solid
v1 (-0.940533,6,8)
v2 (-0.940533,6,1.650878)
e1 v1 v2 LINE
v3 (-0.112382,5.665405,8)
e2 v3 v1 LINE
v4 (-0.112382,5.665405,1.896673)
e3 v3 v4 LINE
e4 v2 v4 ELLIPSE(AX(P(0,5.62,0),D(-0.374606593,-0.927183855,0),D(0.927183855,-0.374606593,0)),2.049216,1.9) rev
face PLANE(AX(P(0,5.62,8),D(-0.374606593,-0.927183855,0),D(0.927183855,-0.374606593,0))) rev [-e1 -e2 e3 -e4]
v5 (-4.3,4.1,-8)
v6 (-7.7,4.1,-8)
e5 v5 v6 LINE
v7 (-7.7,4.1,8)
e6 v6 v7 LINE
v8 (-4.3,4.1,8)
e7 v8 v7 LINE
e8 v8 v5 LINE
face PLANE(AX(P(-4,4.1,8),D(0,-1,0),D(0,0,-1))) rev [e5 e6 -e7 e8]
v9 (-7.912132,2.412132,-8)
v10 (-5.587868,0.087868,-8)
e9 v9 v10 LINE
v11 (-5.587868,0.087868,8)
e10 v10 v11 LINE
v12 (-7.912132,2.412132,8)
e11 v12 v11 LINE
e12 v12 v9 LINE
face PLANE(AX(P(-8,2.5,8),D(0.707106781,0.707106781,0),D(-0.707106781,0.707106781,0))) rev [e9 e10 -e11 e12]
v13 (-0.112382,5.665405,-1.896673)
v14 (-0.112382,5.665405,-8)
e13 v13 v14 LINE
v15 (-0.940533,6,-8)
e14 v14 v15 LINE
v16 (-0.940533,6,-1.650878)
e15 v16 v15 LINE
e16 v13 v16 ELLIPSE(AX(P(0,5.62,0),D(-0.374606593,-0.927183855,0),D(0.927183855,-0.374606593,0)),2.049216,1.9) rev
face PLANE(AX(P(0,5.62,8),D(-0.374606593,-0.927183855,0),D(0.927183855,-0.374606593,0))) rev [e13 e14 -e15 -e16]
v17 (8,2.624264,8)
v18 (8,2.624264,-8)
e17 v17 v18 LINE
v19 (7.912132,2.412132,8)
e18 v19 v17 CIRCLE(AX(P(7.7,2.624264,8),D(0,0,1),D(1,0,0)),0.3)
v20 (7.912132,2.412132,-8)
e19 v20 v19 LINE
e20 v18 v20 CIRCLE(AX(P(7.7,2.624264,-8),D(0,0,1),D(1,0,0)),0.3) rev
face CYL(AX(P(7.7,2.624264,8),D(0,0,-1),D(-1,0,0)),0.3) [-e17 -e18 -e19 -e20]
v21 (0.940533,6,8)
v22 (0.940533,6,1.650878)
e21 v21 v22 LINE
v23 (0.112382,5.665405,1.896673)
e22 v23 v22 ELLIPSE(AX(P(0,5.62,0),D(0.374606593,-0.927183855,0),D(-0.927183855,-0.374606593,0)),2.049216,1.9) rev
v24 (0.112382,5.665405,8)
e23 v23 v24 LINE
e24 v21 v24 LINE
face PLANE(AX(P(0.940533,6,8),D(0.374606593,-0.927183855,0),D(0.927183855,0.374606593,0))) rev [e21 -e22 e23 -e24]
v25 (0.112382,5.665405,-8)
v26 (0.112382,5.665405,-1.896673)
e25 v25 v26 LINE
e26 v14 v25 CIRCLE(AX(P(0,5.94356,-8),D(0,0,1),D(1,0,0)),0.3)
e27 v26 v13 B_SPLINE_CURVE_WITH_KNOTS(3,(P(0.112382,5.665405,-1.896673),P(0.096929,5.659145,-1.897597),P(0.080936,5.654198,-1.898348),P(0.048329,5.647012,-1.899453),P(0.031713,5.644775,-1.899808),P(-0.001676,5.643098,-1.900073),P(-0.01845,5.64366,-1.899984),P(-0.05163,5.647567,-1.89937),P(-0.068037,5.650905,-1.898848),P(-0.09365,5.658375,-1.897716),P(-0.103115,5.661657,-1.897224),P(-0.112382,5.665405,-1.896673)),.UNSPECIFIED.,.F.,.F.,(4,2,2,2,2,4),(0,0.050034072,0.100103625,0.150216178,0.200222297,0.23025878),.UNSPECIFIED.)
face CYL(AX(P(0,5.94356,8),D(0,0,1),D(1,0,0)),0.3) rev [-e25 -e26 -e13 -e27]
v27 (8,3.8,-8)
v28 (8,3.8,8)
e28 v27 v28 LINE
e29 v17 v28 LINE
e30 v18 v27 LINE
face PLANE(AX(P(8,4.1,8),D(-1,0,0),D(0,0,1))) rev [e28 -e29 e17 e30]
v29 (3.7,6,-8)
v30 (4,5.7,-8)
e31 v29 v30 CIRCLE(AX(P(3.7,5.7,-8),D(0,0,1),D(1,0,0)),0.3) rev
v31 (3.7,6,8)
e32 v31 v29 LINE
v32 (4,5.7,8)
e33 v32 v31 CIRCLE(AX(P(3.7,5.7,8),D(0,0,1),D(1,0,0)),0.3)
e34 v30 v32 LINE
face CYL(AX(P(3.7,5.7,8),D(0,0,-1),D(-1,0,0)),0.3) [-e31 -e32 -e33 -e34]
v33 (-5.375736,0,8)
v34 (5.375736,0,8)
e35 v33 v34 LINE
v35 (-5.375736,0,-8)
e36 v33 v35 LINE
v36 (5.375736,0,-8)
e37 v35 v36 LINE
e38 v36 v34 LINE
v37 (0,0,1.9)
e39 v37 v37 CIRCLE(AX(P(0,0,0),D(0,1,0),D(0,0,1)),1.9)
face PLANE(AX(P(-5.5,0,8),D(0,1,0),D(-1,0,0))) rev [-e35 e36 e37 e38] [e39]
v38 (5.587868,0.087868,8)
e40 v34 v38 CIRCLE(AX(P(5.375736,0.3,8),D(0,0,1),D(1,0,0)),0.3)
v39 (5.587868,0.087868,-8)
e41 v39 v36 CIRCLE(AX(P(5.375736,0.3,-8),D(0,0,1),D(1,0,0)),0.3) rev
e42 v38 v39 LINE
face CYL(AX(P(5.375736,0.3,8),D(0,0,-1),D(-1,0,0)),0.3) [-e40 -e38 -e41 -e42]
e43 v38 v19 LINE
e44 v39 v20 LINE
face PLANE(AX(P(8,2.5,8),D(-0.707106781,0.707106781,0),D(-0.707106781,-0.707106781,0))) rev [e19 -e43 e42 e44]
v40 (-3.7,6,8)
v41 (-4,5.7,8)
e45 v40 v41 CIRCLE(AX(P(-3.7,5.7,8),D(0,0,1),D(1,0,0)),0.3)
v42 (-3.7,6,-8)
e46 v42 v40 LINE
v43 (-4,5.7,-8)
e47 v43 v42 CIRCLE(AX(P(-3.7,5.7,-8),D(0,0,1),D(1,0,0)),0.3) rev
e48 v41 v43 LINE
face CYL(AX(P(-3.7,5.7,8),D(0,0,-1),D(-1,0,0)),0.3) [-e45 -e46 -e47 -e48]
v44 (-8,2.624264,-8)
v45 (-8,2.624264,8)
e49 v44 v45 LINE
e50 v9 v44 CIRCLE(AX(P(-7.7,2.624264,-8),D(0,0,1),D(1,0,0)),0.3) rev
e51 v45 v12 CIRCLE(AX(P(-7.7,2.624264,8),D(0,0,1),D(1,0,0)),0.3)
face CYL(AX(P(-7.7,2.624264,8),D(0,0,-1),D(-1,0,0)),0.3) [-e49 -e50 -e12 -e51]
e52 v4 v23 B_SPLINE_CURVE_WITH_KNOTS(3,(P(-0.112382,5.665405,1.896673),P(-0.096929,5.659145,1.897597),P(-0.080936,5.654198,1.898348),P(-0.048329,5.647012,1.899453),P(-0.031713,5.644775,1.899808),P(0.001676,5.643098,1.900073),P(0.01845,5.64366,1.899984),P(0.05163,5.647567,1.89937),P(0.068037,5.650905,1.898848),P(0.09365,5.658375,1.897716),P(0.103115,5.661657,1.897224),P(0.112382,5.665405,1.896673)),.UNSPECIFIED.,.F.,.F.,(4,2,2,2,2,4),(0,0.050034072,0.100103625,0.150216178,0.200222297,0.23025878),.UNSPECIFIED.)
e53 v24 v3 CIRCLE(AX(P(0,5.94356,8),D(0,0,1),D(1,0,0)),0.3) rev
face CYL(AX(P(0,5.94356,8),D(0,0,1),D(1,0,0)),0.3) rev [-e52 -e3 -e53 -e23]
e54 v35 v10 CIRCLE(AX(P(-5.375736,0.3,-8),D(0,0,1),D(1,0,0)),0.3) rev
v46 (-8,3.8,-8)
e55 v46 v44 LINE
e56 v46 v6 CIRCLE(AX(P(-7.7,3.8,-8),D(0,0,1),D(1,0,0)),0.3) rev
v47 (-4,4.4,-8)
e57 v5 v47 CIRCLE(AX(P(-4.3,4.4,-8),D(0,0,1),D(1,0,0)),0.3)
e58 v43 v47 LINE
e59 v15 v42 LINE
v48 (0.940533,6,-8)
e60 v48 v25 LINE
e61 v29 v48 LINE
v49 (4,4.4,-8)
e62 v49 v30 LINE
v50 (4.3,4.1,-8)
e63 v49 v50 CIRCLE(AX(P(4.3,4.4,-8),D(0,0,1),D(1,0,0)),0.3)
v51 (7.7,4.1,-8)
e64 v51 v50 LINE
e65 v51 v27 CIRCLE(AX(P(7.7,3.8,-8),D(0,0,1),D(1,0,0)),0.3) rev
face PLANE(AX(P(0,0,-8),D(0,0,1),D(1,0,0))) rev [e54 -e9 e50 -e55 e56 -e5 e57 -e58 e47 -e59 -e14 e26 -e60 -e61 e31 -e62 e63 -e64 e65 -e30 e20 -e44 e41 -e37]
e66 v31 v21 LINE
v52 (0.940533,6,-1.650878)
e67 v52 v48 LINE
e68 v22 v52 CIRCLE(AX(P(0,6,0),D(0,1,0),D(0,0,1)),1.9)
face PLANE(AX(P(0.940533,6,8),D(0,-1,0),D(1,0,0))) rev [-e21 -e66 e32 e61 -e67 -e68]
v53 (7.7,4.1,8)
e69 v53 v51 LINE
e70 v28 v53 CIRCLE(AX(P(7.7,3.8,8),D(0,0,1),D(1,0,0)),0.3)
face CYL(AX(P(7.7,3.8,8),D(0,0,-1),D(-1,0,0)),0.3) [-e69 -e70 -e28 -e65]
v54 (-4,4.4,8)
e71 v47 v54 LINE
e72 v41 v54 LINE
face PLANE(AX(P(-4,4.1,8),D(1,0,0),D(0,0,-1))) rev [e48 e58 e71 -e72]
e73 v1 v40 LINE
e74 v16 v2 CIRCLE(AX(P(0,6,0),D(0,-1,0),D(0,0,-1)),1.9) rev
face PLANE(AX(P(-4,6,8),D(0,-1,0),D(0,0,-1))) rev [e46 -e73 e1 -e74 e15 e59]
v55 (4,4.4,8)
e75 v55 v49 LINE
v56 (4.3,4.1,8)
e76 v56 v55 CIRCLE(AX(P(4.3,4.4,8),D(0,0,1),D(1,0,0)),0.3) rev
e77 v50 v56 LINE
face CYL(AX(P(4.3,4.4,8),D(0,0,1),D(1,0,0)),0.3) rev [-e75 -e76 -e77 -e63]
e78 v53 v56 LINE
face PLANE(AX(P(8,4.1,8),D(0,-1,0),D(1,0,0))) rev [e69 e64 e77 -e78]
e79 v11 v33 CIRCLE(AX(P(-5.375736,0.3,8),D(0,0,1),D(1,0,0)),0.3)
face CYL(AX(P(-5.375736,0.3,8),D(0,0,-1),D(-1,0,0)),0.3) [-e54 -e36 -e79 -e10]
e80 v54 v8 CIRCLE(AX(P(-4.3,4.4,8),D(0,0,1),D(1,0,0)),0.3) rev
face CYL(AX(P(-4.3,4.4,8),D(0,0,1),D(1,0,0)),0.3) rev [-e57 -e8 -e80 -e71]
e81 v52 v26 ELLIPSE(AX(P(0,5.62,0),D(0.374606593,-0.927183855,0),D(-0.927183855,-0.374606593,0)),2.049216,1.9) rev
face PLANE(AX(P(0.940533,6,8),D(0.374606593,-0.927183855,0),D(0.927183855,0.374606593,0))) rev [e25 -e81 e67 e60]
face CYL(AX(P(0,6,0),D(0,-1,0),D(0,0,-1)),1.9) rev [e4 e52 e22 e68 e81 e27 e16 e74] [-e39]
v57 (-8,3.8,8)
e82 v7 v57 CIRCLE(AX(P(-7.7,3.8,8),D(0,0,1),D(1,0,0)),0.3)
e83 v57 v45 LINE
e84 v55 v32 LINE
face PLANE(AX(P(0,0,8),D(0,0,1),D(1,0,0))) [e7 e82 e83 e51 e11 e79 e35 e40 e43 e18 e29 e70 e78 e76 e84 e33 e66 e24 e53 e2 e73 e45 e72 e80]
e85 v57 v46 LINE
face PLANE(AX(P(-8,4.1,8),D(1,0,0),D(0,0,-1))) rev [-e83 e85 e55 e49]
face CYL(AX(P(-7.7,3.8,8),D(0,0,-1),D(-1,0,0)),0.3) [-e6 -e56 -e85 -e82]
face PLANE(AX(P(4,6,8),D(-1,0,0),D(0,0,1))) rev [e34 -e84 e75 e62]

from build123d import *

# Parameters (mm, degrees)
BOSS_EXTRUDE1_DEPTH      = 8
BOSS_EXTRUDE1_DEPTH_BACK = 8
SKETCH9_R                = 1.9
CUT_EXTRUDE2_DEPTH       = 13.806248475
FILLET1_R                = 0.3


with BuildPart() as part:
    # Sketch4 → Boss-Extrude1 (new, two sides: drawn at the far end of the back side and taken through both)
    with BuildSketch(Plane.XY.offset(-BOSS_EXTRUDE1_DEPTH_BACK)):
        Polygon((-8, 4.1), (-8, 2.5), (-5.5, 0), (5.5, 0), (8, 2.5), (8, 4.1), (4, 4.1), (4, 6), (0.940533004, 6), (0, 5.62), (-0.940533004, 6), (-4, 6), (-4, 4.1), align=None)
    extrude(amount=BOSS_EXTRUDE1_DEPTH + BOSS_EXTRUDE1_DEPTH_BACK)

    # Sketch9 → Cut-Extrude2 (cut, through all)
    with BuildSketch(Plane(origin=(0, 0, 0), x_dir=(1, 0, 0), z_dir=(0, 1, 0))):
        with Locations(Location((0, 0, 0), (0, 0, 270))):
            Circle(SKETCH9_R)
    extrude(amount=CUT_EXTRUDE2_DEPTH, mode=Mode.SUBTRACT)

    # Fillet1
    # the kernel refuses this fillet: 0.3 mm, written as the material it adds along each edge
    with BuildSketch(Plane(origin=(-4, 4.1, 8), x_dir=(-1, 0, 0), z_dir=(0, 0, -1)), Plane(origin=(4, 4.1, -8), x_dir=(1, 0, 0), z_dir=(0, 0, 1))) as fillet1_piece_1:
        with BuildLine():
            CenterArc((FILLET1_R, FILLET1_R), FILLET1_R, 180, 90)
            Line((0, FILLET1_R), (0, 0))
            Line((0, 0), (FILLET1_R, 0))
        make_face()
    extrude(amount=16)
    with BuildSketch(Plane(origin=(0, 5.62, -8), x_dir=(0.927183854566788, 0.3746065934159107, 0), z_dir=(0, 0, 1))) as fillet1_piece_2_section:
        with BuildLine():
            CenterArc((FILLET1_R * 0.404026225835, FILLET1_R), FILLET1_R, 226, 44)
            Line((-FILLET1_R * 0.290632144624, FILLET1_R * 0.280660199661), (0, 0))
            Line((0, 0), (FILLET1_R * 0.404026225835, 0))
        make_face()
    fillet1_piece_2 = extrude(amount=6.403019669, mode=Mode.PRIVATE)
    fillet1_piece_2 = fillet1_piece_2 - Plane(origin=(0, 5.639105269, 0), x_dir=(0, 0, 1), z_dir=(0, -1, 0)) * Cylinder(1.9, 14, mode=Mode.PRIVATE)
    add(fillet1_piece_2)
    with BuildSketch(Plane(origin=(0, 5.62, 1.596980331), x_dir=(0.927183854566788, 0.3746065934159107, 0), z_dir=(0, 0, 1))) as fillet1_piece_3_section:
        with BuildLine():
            CenterArc((FILLET1_R * 0.404026225835, FILLET1_R), FILLET1_R, 226, 44)
            Line((-FILLET1_R * 0.290632144624, FILLET1_R * 0.280660199661), (0, 0))
            Line((0, 0), (FILLET1_R * 0.404026225835, 0))
        make_face()
    fillet1_piece_3 = extrude(amount=6.403019669, mode=Mode.PRIVATE)
    fillet1_piece_3 = fillet1_piece_3 - Plane(origin=(0, 5.639105269, 0), x_dir=(0, 0, 1), z_dir=(0, -1, 0)) * Cylinder(1.9, 14, mode=Mode.PRIVATE)
    add(fillet1_piece_3)
    # the kernel refuses this fillet: 0.3 mm, written as the material it takes off along each edge
    with BuildSketch(Plane(origin=(-4, 6, 8.75), x_dir=(1, 0, 0), z_dir=(0, 0, -1))) as fillet1_2_piece_1:
        with BuildLine():
            CenterArc((FILLET1_R, FILLET1_R), FILLET1_R, 180, 90)
            Line((0, FILLET1_R), (0, 0))
            Line((0, 0), (FILLET1_R, 0))
        make_face()
    extrude(amount=17.5, mode=Mode.SUBTRACT)
    with BuildSketch(Plane(origin=(-8, 4.1, 8.75), x_dir=(0, -1, 0), z_dir=(0, 0, -1)), Plane(origin=(8, 4.1, -8.75), x_dir=(0, -1, 0), z_dir=(0, 0, 1)), Plane(origin=(4, 6, -8.75), x_dir=(0, -1, 0), z_dir=(0, 0, 1))) as fillet1_2_piece_2:
        with BuildLine():
            CenterArc((FILLET1_R, -FILLET1_R), FILLET1_R, 90, 90)
            Line((0, -FILLET1_R), (0, 0))
            Line((0, 0), (FILLET1_R, 0))
        make_face()
    extrude(amount=17.5, mode=Mode.SUBTRACT)
    with BuildSketch(Plane(origin=(-8, 2.5, -8.310660172), x_dir=(0, 1, 0), z_dir=(0, 0, 1)), Plane(origin=(-5.5, 0, -8.310660172), x_dir=(-0.7071067811865439, 0.7071067811865512, 0), z_dir=(0, 0, 1)), Plane(origin=(5.5, 0, -8.310660172), x_dir=(-1, 0, 0), z_dir=(0, 0, 1)), Plane(origin=(8, 2.5, -8.310660172), x_dir=(-0.7071067811865492, -0.7071067811865457, 0), z_dir=(0, 0, 1))) as fillet1_2_piece_3:
        with BuildLine():
            CenterArc((FILLET1_R * 0.414213562373, -FILLET1_R), FILLET1_R, 90, 45)
            Line((-FILLET1_R * 0.292893218813, -FILLET1_R * 0.292893218813), (0, 0))
            Line((0, 0), (FILLET1_R * 0.414213562373, 0))
        make_face()
    extrude(amount=16.621320344, mode=Mode.SUBTRACT)


solid = part.part
